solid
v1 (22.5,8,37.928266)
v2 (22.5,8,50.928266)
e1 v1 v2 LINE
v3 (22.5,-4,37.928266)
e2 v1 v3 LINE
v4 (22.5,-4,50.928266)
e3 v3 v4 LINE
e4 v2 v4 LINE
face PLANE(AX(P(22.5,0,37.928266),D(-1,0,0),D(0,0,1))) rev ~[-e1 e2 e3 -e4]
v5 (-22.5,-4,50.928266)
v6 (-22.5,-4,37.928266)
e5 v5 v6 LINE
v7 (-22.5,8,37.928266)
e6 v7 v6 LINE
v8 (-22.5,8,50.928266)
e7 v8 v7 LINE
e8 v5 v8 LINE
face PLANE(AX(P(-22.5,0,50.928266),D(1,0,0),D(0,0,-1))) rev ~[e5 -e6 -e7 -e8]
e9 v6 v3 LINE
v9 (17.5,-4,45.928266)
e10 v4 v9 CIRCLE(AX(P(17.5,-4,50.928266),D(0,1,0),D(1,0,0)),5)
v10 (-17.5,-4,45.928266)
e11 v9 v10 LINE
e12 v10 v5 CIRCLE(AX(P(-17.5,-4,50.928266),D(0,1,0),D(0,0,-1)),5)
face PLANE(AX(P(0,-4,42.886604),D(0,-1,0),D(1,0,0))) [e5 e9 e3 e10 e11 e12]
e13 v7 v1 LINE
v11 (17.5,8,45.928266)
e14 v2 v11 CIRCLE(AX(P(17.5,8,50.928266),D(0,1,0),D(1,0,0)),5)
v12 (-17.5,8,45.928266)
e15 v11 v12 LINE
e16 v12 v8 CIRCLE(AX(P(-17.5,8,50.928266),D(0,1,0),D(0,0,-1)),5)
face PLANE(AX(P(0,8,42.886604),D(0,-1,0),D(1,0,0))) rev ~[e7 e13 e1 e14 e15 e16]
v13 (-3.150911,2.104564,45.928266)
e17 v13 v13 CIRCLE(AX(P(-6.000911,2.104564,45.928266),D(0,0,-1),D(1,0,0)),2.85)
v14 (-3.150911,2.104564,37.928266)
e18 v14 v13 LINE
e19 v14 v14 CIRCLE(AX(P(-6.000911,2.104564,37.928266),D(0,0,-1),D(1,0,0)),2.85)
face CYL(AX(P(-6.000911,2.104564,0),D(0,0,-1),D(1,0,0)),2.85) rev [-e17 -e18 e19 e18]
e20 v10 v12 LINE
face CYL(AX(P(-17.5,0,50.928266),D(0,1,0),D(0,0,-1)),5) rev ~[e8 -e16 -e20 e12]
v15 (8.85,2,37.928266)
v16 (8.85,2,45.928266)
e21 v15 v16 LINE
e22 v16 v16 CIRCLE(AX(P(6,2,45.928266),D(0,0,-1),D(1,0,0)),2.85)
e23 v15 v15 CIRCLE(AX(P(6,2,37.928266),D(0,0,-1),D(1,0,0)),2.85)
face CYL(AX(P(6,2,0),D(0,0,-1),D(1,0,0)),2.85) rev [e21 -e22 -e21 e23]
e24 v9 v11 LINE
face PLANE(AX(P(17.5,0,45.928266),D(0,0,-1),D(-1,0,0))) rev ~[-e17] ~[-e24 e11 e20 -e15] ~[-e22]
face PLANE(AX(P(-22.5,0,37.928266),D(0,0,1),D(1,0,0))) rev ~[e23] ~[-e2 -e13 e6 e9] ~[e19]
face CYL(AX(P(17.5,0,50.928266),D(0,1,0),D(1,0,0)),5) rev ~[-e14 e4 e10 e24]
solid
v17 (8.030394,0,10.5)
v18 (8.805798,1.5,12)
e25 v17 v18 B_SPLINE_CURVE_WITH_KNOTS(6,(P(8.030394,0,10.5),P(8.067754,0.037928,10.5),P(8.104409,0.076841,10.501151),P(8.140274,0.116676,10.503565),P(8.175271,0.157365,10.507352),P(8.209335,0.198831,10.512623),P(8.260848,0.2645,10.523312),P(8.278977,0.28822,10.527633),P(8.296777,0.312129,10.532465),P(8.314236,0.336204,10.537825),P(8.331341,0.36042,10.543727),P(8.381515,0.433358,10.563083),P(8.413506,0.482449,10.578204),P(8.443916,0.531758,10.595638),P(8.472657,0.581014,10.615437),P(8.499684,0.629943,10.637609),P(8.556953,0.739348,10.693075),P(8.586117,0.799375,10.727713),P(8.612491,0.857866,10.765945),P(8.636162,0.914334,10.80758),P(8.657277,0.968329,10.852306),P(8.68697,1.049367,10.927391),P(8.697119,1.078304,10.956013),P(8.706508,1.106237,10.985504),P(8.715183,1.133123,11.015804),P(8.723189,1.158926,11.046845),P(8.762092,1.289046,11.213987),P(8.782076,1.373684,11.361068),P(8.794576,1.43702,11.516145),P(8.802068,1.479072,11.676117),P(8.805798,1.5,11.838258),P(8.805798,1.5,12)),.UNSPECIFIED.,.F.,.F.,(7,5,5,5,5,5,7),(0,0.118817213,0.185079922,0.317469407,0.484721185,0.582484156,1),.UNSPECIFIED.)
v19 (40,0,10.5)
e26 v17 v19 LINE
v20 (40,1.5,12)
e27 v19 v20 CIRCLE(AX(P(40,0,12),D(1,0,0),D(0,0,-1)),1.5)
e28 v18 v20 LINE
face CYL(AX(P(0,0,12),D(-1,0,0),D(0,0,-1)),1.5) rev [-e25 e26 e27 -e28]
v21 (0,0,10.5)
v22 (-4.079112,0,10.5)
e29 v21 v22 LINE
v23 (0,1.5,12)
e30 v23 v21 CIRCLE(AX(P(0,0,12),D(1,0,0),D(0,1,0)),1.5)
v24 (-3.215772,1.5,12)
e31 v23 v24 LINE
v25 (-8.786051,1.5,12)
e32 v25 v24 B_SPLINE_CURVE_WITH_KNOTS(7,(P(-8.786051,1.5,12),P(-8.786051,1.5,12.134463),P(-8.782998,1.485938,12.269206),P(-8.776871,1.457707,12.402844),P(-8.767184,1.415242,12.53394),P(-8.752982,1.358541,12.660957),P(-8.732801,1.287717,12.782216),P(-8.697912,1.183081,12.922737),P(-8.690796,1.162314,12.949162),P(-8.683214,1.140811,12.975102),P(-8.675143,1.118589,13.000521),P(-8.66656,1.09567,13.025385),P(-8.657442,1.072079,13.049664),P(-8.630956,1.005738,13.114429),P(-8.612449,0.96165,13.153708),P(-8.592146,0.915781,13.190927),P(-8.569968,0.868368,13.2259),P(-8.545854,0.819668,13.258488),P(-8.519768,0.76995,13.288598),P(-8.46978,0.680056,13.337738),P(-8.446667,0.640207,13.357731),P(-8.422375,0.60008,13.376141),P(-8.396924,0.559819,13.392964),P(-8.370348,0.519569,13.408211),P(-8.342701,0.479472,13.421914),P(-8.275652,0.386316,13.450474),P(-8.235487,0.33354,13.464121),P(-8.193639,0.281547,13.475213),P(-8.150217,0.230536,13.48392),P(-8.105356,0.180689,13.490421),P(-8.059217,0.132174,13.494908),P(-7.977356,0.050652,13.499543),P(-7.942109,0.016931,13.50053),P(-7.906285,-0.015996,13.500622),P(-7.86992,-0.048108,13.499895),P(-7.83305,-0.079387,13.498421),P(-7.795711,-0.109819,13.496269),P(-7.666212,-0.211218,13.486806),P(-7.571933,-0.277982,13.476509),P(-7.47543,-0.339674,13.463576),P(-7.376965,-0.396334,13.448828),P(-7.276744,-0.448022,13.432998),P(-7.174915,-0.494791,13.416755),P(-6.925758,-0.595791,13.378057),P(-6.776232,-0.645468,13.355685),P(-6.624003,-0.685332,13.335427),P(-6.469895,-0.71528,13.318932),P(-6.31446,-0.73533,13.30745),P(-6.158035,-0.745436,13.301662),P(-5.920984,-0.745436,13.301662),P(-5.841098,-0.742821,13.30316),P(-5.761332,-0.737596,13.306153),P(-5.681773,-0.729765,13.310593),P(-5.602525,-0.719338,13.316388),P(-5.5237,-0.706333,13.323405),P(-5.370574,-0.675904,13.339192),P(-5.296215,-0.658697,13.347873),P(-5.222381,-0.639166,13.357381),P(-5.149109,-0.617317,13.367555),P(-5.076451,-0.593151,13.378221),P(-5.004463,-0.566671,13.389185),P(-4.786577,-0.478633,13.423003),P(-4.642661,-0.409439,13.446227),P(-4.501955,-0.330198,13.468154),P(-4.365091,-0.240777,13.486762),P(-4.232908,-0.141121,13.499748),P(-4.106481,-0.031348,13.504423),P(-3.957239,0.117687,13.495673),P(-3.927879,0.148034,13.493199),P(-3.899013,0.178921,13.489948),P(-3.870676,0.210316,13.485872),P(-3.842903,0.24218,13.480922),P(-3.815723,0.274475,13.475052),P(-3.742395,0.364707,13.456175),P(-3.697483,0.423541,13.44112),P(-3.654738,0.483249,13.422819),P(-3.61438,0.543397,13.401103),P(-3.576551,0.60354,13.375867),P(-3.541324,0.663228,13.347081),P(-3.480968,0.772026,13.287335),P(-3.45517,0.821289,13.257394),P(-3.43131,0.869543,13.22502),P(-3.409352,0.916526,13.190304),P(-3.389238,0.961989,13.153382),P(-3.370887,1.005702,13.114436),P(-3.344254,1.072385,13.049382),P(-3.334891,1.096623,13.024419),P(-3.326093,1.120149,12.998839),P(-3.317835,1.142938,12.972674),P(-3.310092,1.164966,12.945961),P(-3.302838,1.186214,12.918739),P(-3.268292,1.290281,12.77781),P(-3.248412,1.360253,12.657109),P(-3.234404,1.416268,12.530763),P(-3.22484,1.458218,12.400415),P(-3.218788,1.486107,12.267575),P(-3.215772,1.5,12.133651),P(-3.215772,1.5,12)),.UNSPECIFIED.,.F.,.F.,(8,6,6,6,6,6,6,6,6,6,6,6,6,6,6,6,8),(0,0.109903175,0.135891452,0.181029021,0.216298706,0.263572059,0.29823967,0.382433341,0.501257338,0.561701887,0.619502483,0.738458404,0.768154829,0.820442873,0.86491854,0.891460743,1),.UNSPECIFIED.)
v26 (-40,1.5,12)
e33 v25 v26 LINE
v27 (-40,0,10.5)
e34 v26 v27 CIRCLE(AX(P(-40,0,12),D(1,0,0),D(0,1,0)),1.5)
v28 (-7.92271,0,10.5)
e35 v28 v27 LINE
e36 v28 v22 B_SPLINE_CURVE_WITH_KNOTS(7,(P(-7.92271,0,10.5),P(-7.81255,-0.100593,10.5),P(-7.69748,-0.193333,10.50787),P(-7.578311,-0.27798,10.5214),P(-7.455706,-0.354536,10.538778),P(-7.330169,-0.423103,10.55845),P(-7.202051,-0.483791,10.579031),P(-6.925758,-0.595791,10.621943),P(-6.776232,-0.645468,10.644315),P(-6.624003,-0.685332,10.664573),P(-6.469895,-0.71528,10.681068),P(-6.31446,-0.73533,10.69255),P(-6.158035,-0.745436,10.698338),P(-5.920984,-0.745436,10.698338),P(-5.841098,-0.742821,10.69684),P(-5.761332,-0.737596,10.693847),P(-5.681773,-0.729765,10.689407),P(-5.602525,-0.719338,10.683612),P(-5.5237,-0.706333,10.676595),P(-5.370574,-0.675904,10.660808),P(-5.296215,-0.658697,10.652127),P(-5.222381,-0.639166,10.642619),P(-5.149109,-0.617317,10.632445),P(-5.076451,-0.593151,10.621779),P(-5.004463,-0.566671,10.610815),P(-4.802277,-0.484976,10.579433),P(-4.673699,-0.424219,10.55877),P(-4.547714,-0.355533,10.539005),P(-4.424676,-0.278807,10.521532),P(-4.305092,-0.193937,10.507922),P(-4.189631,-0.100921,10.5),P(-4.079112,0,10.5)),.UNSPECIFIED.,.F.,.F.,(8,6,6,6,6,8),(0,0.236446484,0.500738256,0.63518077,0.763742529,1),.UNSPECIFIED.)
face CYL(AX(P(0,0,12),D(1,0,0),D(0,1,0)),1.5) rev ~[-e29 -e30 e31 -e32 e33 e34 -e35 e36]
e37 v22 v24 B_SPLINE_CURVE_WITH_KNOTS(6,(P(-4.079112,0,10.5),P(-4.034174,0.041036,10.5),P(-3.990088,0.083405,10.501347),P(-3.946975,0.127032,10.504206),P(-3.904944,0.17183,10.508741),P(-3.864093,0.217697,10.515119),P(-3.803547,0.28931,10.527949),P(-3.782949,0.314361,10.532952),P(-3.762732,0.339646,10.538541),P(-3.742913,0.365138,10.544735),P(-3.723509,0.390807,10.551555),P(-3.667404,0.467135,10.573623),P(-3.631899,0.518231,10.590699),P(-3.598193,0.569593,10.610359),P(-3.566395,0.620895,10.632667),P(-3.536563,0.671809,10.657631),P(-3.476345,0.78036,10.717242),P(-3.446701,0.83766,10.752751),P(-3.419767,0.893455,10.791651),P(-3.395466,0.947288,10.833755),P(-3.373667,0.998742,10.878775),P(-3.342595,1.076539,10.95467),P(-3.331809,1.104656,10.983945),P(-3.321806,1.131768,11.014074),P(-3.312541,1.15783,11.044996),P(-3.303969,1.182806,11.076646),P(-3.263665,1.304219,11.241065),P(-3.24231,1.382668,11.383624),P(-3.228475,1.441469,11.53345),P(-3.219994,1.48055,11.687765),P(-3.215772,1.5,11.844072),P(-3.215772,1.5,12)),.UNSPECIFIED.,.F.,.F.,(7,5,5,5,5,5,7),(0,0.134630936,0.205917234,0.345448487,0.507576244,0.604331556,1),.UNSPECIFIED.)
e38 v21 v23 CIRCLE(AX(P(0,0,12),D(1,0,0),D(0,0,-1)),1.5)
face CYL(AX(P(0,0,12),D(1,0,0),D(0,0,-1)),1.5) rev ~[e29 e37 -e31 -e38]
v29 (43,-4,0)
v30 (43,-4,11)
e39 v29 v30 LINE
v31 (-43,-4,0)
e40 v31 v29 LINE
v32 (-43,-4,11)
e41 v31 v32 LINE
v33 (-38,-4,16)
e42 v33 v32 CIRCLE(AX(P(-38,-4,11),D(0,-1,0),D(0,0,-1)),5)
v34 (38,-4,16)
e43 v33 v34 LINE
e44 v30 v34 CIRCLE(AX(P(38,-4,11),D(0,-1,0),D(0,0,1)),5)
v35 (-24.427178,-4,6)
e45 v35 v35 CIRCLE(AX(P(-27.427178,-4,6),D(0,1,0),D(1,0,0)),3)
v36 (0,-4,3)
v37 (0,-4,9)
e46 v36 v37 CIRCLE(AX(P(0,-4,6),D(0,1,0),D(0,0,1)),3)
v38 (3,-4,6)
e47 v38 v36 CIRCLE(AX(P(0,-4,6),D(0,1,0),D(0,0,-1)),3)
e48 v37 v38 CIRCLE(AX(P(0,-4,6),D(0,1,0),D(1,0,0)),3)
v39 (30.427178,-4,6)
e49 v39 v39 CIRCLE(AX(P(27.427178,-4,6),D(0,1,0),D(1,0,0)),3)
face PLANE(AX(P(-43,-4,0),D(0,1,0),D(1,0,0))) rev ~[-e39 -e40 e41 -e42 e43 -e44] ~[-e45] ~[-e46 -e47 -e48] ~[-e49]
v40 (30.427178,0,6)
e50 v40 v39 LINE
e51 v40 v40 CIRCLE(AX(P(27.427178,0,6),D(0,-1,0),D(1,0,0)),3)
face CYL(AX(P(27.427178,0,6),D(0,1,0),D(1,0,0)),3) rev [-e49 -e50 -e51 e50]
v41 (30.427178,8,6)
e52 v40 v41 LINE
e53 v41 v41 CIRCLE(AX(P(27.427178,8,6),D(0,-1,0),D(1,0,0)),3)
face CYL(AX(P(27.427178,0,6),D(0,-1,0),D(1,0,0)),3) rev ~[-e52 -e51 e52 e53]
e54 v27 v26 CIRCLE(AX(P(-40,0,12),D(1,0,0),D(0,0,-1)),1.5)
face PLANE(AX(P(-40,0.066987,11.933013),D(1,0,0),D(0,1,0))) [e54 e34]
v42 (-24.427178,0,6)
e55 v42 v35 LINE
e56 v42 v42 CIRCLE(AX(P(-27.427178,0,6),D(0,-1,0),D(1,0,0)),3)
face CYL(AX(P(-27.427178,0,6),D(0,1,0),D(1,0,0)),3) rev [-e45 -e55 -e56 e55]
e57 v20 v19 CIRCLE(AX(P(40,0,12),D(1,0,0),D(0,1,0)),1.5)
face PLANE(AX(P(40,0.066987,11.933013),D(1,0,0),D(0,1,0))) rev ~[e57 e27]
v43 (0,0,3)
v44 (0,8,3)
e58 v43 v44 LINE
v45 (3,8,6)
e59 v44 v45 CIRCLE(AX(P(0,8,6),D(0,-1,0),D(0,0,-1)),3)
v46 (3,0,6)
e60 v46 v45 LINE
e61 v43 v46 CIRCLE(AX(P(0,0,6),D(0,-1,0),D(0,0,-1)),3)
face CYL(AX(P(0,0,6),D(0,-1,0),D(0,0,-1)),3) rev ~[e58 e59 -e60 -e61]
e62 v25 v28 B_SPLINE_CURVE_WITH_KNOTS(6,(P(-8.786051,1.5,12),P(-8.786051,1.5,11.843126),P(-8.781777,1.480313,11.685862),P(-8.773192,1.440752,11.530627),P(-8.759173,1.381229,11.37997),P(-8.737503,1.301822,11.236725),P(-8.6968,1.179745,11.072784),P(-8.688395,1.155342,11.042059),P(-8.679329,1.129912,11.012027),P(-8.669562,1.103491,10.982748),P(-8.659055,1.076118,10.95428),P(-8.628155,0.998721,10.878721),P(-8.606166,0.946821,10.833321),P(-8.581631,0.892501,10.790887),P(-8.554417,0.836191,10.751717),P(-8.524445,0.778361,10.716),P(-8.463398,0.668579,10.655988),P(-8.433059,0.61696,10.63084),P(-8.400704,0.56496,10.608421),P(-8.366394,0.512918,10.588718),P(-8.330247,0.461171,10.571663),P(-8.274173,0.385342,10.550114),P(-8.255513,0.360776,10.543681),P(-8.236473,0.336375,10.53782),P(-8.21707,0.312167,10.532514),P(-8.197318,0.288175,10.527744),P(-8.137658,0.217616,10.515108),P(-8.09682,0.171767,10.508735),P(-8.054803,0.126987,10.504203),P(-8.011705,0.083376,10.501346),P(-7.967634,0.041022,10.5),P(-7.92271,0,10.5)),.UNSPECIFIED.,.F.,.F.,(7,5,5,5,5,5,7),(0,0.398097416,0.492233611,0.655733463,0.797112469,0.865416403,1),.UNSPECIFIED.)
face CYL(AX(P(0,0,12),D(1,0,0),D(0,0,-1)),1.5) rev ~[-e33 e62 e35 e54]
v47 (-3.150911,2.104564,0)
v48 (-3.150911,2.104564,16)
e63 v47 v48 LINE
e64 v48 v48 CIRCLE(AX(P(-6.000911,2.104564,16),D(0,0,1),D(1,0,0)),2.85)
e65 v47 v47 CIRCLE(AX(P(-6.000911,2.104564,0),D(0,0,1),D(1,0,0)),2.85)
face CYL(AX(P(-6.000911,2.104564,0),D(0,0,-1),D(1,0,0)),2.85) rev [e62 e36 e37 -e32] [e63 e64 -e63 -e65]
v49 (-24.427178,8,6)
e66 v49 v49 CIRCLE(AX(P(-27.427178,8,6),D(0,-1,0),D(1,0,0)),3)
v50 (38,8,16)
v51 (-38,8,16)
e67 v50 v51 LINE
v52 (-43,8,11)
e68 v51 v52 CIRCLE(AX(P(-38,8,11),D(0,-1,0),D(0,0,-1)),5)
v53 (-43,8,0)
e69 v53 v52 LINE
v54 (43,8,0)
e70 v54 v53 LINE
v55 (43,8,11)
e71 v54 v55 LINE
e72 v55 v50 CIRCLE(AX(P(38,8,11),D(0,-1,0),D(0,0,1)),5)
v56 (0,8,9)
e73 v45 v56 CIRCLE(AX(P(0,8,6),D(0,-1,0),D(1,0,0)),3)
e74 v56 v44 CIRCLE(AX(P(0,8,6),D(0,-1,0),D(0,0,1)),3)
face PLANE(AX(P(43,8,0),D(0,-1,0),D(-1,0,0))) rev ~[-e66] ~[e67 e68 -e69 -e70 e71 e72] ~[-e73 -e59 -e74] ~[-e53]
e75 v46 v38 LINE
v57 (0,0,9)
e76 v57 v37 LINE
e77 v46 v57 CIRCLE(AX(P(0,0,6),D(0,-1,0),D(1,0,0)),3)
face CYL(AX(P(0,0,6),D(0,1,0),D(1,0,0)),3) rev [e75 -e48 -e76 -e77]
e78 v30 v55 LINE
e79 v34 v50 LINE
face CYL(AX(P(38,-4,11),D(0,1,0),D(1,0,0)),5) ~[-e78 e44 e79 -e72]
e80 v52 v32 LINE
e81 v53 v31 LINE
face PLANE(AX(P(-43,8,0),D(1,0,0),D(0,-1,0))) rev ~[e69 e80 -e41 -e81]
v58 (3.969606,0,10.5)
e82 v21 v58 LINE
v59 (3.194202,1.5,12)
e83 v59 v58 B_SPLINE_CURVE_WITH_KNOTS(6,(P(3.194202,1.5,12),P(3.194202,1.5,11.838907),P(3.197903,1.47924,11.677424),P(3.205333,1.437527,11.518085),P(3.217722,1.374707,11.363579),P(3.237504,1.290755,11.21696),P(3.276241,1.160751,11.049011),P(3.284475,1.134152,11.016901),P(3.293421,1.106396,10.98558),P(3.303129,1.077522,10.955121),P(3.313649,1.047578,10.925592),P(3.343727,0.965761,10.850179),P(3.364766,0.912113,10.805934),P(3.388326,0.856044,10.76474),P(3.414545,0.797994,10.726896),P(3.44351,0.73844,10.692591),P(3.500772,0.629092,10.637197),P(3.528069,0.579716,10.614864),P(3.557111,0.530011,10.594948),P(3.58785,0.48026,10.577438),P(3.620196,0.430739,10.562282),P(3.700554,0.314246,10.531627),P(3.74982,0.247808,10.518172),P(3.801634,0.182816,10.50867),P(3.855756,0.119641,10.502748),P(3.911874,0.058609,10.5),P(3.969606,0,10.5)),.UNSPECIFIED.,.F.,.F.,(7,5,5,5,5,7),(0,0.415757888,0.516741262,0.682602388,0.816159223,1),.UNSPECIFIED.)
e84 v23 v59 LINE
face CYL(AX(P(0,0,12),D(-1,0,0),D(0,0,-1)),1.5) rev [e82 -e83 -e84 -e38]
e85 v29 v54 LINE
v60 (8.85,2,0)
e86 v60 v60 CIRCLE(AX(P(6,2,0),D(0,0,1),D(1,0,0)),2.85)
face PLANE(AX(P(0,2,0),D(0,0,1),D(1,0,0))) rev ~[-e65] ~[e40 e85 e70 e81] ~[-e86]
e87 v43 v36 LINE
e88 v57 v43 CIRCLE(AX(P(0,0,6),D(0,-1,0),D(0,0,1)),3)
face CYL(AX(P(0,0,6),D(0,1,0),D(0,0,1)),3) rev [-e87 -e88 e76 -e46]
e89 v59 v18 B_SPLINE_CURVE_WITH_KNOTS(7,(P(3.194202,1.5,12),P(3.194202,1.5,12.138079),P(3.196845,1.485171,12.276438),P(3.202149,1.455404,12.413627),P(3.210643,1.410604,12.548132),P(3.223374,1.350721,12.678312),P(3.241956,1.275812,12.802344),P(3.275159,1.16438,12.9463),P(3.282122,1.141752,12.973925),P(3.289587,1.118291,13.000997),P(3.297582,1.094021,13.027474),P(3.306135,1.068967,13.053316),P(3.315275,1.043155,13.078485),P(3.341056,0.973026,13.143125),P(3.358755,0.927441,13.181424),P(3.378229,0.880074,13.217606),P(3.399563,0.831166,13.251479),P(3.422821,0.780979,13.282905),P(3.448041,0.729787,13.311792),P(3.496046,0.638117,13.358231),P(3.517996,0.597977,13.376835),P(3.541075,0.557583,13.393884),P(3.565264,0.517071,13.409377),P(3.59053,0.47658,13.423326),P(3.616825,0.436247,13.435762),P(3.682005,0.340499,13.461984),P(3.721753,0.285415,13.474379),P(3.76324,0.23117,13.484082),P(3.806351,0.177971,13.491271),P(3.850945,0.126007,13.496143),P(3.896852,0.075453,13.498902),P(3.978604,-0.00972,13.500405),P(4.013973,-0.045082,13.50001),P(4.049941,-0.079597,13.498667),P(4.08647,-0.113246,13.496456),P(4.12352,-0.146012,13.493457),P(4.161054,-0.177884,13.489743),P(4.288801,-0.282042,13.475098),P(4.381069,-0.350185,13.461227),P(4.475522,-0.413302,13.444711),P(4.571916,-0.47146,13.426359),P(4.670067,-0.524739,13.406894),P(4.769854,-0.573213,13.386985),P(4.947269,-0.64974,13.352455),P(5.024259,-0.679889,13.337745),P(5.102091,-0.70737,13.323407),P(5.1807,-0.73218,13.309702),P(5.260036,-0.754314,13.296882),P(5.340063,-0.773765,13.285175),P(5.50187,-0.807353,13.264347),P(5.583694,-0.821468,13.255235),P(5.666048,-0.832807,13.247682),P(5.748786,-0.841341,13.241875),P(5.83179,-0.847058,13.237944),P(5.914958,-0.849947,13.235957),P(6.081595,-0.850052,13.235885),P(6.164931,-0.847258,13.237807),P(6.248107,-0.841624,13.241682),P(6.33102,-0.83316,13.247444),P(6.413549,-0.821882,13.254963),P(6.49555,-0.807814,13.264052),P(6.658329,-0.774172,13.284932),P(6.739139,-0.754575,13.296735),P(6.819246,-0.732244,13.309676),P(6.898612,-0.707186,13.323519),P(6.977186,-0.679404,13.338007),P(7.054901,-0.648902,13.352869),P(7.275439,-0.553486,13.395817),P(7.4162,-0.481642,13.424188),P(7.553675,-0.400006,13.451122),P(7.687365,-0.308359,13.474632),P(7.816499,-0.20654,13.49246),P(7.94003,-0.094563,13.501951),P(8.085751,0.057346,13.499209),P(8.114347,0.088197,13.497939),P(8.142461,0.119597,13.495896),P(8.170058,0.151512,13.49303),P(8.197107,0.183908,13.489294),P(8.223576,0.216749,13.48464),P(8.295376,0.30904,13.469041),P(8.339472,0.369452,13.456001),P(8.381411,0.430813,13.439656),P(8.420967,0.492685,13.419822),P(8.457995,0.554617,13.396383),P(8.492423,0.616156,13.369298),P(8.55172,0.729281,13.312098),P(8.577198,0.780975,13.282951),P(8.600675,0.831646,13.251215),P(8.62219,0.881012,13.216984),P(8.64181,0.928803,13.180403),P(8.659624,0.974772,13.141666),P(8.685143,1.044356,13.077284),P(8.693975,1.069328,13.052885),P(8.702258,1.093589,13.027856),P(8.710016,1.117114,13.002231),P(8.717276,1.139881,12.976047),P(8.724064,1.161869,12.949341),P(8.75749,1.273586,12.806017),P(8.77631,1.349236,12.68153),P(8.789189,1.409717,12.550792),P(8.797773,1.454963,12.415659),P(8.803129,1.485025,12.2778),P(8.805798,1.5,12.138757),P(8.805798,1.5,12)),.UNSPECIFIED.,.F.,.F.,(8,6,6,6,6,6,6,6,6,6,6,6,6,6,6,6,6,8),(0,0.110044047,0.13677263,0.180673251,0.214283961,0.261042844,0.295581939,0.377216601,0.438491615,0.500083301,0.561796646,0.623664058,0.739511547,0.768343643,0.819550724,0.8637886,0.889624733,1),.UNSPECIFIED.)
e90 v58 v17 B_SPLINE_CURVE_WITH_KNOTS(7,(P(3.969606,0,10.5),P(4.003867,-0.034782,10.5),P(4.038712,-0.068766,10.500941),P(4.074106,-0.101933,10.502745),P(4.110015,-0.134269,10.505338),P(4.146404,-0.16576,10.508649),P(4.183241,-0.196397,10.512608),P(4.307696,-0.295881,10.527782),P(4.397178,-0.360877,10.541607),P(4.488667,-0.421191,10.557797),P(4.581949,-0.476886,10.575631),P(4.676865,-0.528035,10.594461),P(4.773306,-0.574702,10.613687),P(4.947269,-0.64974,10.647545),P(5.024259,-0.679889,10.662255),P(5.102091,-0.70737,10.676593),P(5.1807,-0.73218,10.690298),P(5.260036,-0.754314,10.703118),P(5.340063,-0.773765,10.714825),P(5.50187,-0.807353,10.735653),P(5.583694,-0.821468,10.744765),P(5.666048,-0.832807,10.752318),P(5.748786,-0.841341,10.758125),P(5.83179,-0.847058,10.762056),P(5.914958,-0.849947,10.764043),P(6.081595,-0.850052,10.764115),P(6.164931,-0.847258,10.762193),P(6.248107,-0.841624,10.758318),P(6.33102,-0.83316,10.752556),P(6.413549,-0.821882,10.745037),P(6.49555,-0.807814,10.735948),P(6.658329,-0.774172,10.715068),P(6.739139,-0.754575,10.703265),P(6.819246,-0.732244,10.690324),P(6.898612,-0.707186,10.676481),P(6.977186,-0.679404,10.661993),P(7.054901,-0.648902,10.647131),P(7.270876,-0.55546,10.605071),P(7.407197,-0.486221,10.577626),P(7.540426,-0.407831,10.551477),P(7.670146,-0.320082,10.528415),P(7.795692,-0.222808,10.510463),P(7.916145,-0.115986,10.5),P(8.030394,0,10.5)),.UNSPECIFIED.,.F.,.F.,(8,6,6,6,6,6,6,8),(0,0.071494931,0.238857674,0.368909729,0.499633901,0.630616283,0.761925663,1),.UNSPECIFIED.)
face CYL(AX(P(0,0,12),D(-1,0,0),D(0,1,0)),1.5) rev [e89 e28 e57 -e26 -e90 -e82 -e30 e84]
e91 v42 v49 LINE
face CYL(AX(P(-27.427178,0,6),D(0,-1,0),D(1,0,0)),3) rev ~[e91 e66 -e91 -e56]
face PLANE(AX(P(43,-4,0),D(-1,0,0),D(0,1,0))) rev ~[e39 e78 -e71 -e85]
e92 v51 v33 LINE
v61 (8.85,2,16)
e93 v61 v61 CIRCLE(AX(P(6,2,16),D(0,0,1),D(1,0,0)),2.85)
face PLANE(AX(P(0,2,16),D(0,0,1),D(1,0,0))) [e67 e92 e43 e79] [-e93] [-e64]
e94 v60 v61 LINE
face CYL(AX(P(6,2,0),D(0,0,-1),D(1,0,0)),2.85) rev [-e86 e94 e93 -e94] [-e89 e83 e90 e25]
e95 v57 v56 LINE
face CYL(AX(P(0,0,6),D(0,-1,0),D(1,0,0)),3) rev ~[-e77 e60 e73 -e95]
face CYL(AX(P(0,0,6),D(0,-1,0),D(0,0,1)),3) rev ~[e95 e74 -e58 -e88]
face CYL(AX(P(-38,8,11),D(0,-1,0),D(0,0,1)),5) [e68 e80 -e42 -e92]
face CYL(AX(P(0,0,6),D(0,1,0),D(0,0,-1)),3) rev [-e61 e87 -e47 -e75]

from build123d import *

# Parameters (mm, degrees)
F0_R          = 2.85
F1_DEPTH      = 16
F2_R          = 3
F3_DEPTH      = 12.5
F5_DEPTH      = 40
F7_DEPTH      = 8
F7_DEPTH_BACK = 4
F8_DEPTH      = 50.929265815
F9_R          = 5


# Not quite as in the source:
# - a feature names something its author has since deleted; it is built from what else it names


with BuildPart() as f1:
    # F0 (on Top) → F1 (new body)
    with BuildSketch(Plane.XY):
        Polygon((20.2244706452, -4), (35, -4), (43, -4), (43, 8), (35, 8), (20.2244706452, 8), (19.8490470648, 8), (-35, 8), (-43, 8), (-43, -4), (-35, -4), (-20.2244706452, -4), (-19.8490470648, -4), (19.8490470648, -4), align=None)
        with Locations((-6.0009112008, 2.1045637578)):
            Circle(F0_R, mode=Mode.SUBTRACT)
        with Locations((6, 2)):
            Circle(F0_R, mode=Mode.SUBTRACT)
    extrude(amount=F1_DEPTH)

    # F2 (on Front) → F3 (cut, symmetric)
    with BuildSketch(Plane.XZ):
        with Locations((-27.4271778762, 6)):
            Circle(F2_R)
        with Locations((27.4271778762, 6)):
            Circle(F2_R)
        with BuildLine():
            ThreePointArc((0, 9), (-3, 6), (0, 3))
            Line((0, 3), (0, 9))
        make_face()
        with BuildLine():
            Line((0, 9), (0, 3))
            ThreePointArc((0, 3), (2.1213203436, 3.8786796564), (3, 6))
            ThreePointArc((3, 6), (2.1213203436, 8.1213203436), (0, 9))
        make_face()
    extrude(amount=F3_DEPTH, both=True, mode=Mode.SUBTRACT)

    # F4 (on Right) → F5 (cut, symmetric)
    with BuildSketch(Plane.YZ):
        with BuildLine():
            ThreePointArc((0, 10.5), (1.0606601718, 10.9393398282), (1.5, 12))
            ThreePointArc((1.5, 12), (-1.0606601718, 13.0606601718), (0, 10.5))
        make_face()
    extrude(amount=F5_DEPTH, both=True, mode=Mode.SUBTRACT)

    # F9
    f9_edges = [f1.edges().sort_by_distance(p)[0] for p in [
        (-43, 2, 16),
        (43, 2, 16),
    ]]
    fillet(f9_edges, radius=F9_R)


with BuildPart() as f7:
    # F6 (on Front) → F7 (new body, two sides)
    with BuildSketch(Plane.XZ) as f7_sk:
        with BuildLine():
            Line((-22.5, 50.928265815), (-22.5, 37.928265815))
            Line((-22.5, 37.928265815), (22.5, 37.928265815))
            Line((22.5, 37.928265815), (22.5, 45.928265815))
            Line((22.5, 45.928265815), (22.5, 50.928265815))
            ThreePointArc((22.5, 50.928265815), (21.0355339059, 47.3927319091), (17.5, 45.928265815))
            Line((17.5, 45.928265815), (-17.5, 45.928265815))
            ThreePointArc((-17.5, 45.928265815), (-21.0355339059, 47.3927319091), (-22.5, 50.928265815))
        make_face()
    extrude(amount=-F7_DEPTH)
    extrude(f7_sk.sketch, amount=F7_DEPTH_BACK)

    # F0 (on Top) → F8 (cut, through all)
    with BuildSketch(Plane.XY):
        with Locations((-6.0009112008, 2.1045637578)):
            Circle(F0_R)
        with Locations((6, 2)):
            Circle(F0_R)
    extrude(amount=F8_DEPTH, mode=Mode.SUBTRACT)


solid = Compound([f1.part, f7.part])
